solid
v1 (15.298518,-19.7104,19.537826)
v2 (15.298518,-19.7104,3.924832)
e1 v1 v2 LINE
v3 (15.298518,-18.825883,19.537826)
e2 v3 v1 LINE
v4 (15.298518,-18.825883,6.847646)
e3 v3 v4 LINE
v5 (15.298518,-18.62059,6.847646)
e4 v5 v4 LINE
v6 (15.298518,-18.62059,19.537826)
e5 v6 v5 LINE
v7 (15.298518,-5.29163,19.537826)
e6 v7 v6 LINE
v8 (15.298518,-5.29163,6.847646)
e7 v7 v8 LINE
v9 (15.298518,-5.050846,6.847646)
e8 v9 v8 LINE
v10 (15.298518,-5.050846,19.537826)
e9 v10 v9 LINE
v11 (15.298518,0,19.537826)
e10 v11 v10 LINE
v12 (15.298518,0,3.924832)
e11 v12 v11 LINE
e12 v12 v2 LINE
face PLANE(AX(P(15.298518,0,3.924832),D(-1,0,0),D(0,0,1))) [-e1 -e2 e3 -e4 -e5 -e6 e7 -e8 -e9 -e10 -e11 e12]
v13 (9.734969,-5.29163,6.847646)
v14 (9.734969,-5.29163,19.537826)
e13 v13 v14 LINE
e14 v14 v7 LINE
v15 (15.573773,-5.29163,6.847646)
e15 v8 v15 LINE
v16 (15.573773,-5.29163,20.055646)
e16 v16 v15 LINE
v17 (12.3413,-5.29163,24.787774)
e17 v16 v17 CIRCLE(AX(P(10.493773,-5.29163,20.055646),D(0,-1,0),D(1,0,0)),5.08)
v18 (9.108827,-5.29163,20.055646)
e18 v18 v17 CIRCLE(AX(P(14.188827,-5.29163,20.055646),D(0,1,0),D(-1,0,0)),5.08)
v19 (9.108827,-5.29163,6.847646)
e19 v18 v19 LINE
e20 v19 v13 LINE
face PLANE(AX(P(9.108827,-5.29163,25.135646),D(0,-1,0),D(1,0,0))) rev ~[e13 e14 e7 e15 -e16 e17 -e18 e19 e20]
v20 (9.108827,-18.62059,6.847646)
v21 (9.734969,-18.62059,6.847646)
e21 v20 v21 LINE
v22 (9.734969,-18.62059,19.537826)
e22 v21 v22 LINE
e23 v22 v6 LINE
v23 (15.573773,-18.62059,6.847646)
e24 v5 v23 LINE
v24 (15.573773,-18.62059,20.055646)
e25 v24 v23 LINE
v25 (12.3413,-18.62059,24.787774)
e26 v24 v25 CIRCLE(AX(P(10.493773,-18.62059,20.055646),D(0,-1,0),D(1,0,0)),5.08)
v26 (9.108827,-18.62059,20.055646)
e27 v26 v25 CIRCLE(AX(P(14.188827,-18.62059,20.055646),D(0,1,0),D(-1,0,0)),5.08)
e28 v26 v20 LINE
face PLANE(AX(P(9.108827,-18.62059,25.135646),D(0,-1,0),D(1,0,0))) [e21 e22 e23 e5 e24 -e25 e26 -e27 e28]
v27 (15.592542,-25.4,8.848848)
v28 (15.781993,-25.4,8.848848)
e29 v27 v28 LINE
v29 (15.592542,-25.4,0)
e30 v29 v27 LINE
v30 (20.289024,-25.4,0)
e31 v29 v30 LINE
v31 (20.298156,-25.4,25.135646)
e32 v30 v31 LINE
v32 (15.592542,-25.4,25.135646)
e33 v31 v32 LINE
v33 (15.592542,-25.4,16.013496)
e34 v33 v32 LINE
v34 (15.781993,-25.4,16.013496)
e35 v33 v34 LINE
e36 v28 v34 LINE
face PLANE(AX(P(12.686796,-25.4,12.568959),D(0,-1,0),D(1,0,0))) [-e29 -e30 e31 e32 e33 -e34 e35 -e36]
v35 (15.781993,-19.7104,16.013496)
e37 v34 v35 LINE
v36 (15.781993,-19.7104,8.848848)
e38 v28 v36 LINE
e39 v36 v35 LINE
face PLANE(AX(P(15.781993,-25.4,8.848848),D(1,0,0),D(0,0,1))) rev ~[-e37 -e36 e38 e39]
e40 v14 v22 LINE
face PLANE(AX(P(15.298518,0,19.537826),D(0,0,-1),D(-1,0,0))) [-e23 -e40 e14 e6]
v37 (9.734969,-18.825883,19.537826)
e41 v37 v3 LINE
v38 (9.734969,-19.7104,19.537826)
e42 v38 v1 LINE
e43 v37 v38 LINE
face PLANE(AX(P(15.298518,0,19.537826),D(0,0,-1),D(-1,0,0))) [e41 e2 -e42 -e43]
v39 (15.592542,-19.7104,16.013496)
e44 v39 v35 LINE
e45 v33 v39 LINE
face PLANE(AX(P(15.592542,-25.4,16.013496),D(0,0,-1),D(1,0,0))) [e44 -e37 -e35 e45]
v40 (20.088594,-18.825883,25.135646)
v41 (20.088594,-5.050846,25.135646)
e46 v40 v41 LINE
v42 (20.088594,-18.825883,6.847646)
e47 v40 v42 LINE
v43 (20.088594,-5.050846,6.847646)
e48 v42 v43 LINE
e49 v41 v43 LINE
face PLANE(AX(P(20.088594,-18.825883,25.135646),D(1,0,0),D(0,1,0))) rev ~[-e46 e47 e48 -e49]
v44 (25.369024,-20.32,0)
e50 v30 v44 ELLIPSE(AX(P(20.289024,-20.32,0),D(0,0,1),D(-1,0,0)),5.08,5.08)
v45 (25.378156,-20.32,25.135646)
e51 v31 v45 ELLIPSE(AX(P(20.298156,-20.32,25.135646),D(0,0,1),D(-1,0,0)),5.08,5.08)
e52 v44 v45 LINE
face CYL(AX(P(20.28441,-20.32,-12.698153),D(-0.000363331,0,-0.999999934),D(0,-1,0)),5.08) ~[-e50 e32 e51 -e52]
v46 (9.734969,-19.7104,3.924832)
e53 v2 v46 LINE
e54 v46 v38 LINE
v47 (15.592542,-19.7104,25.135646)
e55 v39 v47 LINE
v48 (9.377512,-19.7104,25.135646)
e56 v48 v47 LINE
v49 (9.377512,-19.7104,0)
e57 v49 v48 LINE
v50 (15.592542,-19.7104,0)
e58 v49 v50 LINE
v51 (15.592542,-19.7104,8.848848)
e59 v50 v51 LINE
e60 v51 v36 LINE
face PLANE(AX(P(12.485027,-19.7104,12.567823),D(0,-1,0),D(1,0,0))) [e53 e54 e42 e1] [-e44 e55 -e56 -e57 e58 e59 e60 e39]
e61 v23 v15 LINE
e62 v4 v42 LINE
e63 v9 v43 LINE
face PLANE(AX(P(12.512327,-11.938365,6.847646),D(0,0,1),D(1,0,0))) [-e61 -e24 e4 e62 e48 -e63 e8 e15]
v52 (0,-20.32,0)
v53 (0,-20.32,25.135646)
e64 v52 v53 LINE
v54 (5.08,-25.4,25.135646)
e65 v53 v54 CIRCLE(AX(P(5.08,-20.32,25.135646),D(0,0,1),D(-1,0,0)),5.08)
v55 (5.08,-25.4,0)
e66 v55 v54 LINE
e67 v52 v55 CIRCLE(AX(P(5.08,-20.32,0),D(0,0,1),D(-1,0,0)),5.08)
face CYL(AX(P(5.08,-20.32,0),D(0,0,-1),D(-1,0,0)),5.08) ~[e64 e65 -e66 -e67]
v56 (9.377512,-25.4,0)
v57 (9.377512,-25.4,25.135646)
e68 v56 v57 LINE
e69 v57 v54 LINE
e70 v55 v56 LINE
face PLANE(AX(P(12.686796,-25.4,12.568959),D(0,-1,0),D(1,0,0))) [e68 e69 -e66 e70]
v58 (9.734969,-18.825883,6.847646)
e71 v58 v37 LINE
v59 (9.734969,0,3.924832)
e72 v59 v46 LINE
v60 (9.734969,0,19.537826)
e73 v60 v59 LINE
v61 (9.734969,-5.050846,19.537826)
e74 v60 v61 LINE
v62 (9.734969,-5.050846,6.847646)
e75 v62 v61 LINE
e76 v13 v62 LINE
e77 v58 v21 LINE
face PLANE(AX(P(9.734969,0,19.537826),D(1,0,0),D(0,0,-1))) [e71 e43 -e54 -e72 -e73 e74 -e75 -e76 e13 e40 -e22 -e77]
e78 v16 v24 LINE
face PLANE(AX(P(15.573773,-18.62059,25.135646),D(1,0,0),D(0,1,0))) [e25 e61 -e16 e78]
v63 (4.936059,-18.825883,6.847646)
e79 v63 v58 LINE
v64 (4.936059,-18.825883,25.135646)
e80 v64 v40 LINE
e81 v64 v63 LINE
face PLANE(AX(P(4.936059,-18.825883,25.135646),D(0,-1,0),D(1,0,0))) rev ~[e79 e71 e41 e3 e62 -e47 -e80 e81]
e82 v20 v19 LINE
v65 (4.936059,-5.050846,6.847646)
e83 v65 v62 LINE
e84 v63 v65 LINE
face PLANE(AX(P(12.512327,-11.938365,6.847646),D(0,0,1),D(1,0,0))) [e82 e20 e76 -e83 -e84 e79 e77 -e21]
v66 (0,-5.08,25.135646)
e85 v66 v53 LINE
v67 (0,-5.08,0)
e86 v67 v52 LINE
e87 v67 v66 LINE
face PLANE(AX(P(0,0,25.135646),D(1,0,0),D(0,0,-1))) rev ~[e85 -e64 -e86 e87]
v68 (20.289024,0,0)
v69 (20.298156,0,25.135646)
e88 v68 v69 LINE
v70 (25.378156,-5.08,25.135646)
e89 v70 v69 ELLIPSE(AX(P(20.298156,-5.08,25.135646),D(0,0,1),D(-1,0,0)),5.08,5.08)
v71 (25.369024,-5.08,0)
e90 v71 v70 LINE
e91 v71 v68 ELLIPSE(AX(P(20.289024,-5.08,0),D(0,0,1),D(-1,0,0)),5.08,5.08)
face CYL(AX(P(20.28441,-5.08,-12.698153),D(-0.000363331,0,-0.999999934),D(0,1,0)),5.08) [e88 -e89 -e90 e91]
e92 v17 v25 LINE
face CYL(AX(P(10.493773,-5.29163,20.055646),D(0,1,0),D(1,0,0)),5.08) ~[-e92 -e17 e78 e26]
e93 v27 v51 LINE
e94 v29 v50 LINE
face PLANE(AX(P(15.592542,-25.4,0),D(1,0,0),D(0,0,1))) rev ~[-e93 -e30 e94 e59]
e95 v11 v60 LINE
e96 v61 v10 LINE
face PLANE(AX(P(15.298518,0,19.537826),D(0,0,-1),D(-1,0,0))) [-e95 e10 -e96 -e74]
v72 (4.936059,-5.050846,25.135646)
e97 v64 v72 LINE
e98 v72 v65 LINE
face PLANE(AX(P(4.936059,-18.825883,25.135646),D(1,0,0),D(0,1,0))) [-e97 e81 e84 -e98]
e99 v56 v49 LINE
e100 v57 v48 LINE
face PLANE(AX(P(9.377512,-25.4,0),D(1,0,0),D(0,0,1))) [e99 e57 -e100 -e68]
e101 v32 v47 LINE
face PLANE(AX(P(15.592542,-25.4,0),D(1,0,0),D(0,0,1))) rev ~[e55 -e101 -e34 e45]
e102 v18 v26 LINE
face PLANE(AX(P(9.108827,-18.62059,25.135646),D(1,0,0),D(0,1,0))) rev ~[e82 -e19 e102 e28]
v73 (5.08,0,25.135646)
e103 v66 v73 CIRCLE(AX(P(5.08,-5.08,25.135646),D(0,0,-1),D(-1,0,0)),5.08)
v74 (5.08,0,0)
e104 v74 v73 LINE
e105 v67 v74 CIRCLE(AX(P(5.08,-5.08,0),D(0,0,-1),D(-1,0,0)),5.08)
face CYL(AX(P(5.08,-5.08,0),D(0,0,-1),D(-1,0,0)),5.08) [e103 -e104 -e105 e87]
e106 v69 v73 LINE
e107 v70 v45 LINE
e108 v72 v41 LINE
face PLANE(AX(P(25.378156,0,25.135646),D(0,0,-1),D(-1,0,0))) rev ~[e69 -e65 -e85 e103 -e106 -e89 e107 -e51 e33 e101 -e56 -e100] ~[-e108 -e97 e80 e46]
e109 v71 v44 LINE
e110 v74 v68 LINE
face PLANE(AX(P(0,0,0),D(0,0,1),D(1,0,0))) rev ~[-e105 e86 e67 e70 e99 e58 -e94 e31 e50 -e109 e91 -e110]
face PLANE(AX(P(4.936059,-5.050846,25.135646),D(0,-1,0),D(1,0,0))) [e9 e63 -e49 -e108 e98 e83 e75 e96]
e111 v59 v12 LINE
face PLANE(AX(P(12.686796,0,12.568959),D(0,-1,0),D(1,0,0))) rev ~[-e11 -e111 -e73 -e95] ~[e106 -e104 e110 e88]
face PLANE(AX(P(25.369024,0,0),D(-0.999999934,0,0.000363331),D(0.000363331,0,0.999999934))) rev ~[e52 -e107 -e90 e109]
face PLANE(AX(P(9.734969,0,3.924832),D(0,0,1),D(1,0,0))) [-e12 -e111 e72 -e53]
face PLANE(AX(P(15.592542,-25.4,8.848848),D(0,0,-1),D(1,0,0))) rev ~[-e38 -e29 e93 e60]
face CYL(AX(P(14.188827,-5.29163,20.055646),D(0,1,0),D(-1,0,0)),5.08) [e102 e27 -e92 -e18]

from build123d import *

# Parameters (mm, degrees)
F1_DEPTH     = 25.4
F2_W         = 15.1525349356
F2_H         = 13.7750366703
F3_DEPTH     = 18.288
F4_W         = 6.4649451524
F4_H         = 13.3289596997
F5_DEPTH     = 22.4028
F7_T1_DEPTH  = 25.1356456429
F7_T3_DEPTH  = 13.3289596997
F7_T8_DEPTH  = 50.5356473019
F7_T14_DEPTH = 50.5356473019
F8_W         = 0.189450098
F8_H         = 7.1646480085
F6_W         = 6.2150303274
F6_H         = 25.1356456429
F9_DEPTH     = 5.6896
F11_DEPTH    = 65.1764


# Not quite as in the source:
# - a fillet or chamfer that OpenCascade refuses, or shapes differently, is made with other operations: its cross-section is extruded or revolved along the edge and cut away or added


with BuildPart() as f1:
    # F0 (on Front) → F1 (new body)
    with BuildSketch(Plane.XZ):
        Polygon((0, 25.1356456429), (0, 0), (25.3690239042, 0), (25.3781564534, 25.1356456429), align=None)
    extrude(amount=F1_DEPTH)

    # F2 (on face) → F3 (cut)
    with BuildSketch(Plane.XY.offset(25.1356456429)):
        with Locations((12.512326939, -11.9383647107)):
            Rectangle(F2_W, F2_H)
    extrude(amount=-F3_DEPTH, mode=Mode.SUBTRACT)

    # F4 (on face) → F5 (join)
    with BuildSketch(Plane.XY.offset(25.1356456429)):
        with Locations((12.3413000256, -11.9561098982)):
            Rectangle(F4_W, F4_H)
    extrude(amount=-F5_DEPTH)

    # F7: fillet of radius 5.08 on 6 edges, made by hand

    # F7_s2 → F7_t1 (cut)
    with BuildSketch(Plane.XY):
        with BuildLine():
            ThreePointArc((0, -20.32), (1.4878975516, -23.9121024484), (5.08, -25.4))
            Line((5.08, -25.4), (5.08, -25.5016))
            Line((5.08, -25.5016), (-0.1016, -25.5016))
            Line((-0.1016, -25.5016), (-0.1016, -20.32))
            Line((-0.1016, -20.32), (0, -20.32))
        make_face()
        with BuildLine():
            ThreePointArc((0, -5.08), (1.4878975516, -1.4878975516), (5.08, 0))
            Line((5.08, 0), (5.08, 0.1016))
            Line((5.08, 0.1016), (-0.1016, 0.1016))
            Line((-0.1016, 0.1016), (-0.1016, -5.08))
            Line((-0.1016, -5.08), (0, -5.08))
        make_face()
    extrude(amount=F7_T1_DEPTH, mode=Mode.SUBTRACT)

    # F7_s4 → F7_t3 (cut)
    with BuildSketch(Plane.XZ.offset(5.2916300483)):
        with BuildLine():
            ThreePointArc((9.1088274494, 20.0556456429), (10.596725001, 23.6477480913), (14.1888274494, 25.1356456429))
            Line((14.1888274494, 25.1356456429), (14.1888274494, 25.2372456429))
            Line((14.1888274494, 25.2372456429), (9.0072274494, 25.2372456429))
            Line((9.0072274494, 25.2372456429), (9.0072274494, 20.0556456429))
            Line((9.0072274494, 20.0556456429), (9.1088274494, 20.0556456429))
        make_face()
        with BuildLine():
            ThreePointArc((15.5737726018, 20.0556456429), (14.0858750502, 23.6477480913), (10.4937726018, 25.1356456429))
            Line((10.4937726018, 25.1356456429), (10.4937726018, 25.2372456429))
            Line((10.4937726018, 25.2372456429), (15.6753726018, 25.2372456429))
            Line((15.6753726018, 25.2372456429), (15.6753726018, 20.0556456429))
            Line((15.6753726018, 20.0556456429), (15.5737726018, 20.0556456429))
        make_face()
    extrude(amount=F7_T3_DEPTH, mode=Mode.SUBTRACT)


with BuildPart() as f7_tool6:
    # F7_s7 → F7_t8 (new body)
    with BuildSketch(Plane(origin=(-0.0046109493, 0, -12.6907818203), x_dir=(0, 1, 0), z_dir=(0.0003633306, 0, 0.999999934))):
        with BuildLine():
            ThreePointArc((-25.4, -20.2890222297), (-23.9121024484, -23.8811246782), (-20.32, -25.3690222297))
            Line((-20.32, -25.3690222297), (-20.32, -25.4706222297))
            Line((-20.32, -25.4706222297), (-25.5016, -25.4706222297))
            Line((-25.5016, -25.4706222297), (-25.5016, -20.2890222297))
            Line((-25.5016, -20.2890222297), (-25.4, -20.2890222297))
        make_face()
    extrude(amount=F7_T8_DEPTH)

    split(bisect_by=Plane.XY.offset(25.1356456429), keep=Keep.BOTTOM)

    split(bisect_by=Plane.XY, keep=Keep.TOP)


with BuildPart() as f1_1:
    add(f1.part)

    # F7_t5: cut F7_tool6
    add(f7_tool6.part, mode=Mode.SUBTRACT)


with BuildPart() as f7_tool12:
    # F7_s13 → F7_t14 (new body)
    with BuildSketch(Plane(origin=(-0.0046109493, 0, -12.6907818203), x_dir=(0, 1, 0), z_dir=(0.0003633306, 0, 0.999999934))):
        with BuildLine():
            ThreePointArc((0, -20.2890222297), (-1.4878975516, -23.8811246782), (-5.08, -25.3690222297))
            Line((-5.08, -25.3690222297), (-5.08, -25.4706222297))
            Line((-5.08, -25.4706222297), (0.1016, -25.4706222297))
            Line((0.1016, -25.4706222297), (0.1016, -20.2890222297))
            Line((0.1016, -20.2890222297), (0, -20.2890222297))
        make_face()
    extrude(amount=F7_T14_DEPTH)

    split(bisect_by=Plane.XY.offset(25.1356456429), keep=Keep.BOTTOM)

    split(bisect_by=Plane.XY, keep=Keep.TOP)


with BuildPart() as f1_2:
    add(f1_1.part)

    # F7_t11: cut F7_tool12
    add(f7_tool12.part, mode=Mode.SUBTRACT)

    # F8 (on face) + F6 (on face) → F9 (cut)
    with BuildSketch(Plane.XZ.offset(25.4)):
        with Locations((15.687267526, 12.4311717227)):
            Rectangle(F8_W, F8_H)
    with BuildSketch(Plane.XZ.offset(25.4)):
        with Locations((12.4850273132, 12.5678228214)):
            Rectangle(F6_W, F6_H)
    extrude(amount=-F9_DEPTH, mode=Mode.SUBTRACT)

    # F10 (on face) → F11 (cut)
    with BuildSketch(Plane.XZ):
        Polygon((15.2985183522, 3.9248324286), (15.2985183522, 15.5202150633), (15.2985183522, 19.5378263631), (9.7349686548, 19.5378263631), (9.7349686548, 3.9248324286), align=None)
    extrude(amount=F11_DEPTH, mode=Mode.SUBTRACT)


solid = f1_2.part
